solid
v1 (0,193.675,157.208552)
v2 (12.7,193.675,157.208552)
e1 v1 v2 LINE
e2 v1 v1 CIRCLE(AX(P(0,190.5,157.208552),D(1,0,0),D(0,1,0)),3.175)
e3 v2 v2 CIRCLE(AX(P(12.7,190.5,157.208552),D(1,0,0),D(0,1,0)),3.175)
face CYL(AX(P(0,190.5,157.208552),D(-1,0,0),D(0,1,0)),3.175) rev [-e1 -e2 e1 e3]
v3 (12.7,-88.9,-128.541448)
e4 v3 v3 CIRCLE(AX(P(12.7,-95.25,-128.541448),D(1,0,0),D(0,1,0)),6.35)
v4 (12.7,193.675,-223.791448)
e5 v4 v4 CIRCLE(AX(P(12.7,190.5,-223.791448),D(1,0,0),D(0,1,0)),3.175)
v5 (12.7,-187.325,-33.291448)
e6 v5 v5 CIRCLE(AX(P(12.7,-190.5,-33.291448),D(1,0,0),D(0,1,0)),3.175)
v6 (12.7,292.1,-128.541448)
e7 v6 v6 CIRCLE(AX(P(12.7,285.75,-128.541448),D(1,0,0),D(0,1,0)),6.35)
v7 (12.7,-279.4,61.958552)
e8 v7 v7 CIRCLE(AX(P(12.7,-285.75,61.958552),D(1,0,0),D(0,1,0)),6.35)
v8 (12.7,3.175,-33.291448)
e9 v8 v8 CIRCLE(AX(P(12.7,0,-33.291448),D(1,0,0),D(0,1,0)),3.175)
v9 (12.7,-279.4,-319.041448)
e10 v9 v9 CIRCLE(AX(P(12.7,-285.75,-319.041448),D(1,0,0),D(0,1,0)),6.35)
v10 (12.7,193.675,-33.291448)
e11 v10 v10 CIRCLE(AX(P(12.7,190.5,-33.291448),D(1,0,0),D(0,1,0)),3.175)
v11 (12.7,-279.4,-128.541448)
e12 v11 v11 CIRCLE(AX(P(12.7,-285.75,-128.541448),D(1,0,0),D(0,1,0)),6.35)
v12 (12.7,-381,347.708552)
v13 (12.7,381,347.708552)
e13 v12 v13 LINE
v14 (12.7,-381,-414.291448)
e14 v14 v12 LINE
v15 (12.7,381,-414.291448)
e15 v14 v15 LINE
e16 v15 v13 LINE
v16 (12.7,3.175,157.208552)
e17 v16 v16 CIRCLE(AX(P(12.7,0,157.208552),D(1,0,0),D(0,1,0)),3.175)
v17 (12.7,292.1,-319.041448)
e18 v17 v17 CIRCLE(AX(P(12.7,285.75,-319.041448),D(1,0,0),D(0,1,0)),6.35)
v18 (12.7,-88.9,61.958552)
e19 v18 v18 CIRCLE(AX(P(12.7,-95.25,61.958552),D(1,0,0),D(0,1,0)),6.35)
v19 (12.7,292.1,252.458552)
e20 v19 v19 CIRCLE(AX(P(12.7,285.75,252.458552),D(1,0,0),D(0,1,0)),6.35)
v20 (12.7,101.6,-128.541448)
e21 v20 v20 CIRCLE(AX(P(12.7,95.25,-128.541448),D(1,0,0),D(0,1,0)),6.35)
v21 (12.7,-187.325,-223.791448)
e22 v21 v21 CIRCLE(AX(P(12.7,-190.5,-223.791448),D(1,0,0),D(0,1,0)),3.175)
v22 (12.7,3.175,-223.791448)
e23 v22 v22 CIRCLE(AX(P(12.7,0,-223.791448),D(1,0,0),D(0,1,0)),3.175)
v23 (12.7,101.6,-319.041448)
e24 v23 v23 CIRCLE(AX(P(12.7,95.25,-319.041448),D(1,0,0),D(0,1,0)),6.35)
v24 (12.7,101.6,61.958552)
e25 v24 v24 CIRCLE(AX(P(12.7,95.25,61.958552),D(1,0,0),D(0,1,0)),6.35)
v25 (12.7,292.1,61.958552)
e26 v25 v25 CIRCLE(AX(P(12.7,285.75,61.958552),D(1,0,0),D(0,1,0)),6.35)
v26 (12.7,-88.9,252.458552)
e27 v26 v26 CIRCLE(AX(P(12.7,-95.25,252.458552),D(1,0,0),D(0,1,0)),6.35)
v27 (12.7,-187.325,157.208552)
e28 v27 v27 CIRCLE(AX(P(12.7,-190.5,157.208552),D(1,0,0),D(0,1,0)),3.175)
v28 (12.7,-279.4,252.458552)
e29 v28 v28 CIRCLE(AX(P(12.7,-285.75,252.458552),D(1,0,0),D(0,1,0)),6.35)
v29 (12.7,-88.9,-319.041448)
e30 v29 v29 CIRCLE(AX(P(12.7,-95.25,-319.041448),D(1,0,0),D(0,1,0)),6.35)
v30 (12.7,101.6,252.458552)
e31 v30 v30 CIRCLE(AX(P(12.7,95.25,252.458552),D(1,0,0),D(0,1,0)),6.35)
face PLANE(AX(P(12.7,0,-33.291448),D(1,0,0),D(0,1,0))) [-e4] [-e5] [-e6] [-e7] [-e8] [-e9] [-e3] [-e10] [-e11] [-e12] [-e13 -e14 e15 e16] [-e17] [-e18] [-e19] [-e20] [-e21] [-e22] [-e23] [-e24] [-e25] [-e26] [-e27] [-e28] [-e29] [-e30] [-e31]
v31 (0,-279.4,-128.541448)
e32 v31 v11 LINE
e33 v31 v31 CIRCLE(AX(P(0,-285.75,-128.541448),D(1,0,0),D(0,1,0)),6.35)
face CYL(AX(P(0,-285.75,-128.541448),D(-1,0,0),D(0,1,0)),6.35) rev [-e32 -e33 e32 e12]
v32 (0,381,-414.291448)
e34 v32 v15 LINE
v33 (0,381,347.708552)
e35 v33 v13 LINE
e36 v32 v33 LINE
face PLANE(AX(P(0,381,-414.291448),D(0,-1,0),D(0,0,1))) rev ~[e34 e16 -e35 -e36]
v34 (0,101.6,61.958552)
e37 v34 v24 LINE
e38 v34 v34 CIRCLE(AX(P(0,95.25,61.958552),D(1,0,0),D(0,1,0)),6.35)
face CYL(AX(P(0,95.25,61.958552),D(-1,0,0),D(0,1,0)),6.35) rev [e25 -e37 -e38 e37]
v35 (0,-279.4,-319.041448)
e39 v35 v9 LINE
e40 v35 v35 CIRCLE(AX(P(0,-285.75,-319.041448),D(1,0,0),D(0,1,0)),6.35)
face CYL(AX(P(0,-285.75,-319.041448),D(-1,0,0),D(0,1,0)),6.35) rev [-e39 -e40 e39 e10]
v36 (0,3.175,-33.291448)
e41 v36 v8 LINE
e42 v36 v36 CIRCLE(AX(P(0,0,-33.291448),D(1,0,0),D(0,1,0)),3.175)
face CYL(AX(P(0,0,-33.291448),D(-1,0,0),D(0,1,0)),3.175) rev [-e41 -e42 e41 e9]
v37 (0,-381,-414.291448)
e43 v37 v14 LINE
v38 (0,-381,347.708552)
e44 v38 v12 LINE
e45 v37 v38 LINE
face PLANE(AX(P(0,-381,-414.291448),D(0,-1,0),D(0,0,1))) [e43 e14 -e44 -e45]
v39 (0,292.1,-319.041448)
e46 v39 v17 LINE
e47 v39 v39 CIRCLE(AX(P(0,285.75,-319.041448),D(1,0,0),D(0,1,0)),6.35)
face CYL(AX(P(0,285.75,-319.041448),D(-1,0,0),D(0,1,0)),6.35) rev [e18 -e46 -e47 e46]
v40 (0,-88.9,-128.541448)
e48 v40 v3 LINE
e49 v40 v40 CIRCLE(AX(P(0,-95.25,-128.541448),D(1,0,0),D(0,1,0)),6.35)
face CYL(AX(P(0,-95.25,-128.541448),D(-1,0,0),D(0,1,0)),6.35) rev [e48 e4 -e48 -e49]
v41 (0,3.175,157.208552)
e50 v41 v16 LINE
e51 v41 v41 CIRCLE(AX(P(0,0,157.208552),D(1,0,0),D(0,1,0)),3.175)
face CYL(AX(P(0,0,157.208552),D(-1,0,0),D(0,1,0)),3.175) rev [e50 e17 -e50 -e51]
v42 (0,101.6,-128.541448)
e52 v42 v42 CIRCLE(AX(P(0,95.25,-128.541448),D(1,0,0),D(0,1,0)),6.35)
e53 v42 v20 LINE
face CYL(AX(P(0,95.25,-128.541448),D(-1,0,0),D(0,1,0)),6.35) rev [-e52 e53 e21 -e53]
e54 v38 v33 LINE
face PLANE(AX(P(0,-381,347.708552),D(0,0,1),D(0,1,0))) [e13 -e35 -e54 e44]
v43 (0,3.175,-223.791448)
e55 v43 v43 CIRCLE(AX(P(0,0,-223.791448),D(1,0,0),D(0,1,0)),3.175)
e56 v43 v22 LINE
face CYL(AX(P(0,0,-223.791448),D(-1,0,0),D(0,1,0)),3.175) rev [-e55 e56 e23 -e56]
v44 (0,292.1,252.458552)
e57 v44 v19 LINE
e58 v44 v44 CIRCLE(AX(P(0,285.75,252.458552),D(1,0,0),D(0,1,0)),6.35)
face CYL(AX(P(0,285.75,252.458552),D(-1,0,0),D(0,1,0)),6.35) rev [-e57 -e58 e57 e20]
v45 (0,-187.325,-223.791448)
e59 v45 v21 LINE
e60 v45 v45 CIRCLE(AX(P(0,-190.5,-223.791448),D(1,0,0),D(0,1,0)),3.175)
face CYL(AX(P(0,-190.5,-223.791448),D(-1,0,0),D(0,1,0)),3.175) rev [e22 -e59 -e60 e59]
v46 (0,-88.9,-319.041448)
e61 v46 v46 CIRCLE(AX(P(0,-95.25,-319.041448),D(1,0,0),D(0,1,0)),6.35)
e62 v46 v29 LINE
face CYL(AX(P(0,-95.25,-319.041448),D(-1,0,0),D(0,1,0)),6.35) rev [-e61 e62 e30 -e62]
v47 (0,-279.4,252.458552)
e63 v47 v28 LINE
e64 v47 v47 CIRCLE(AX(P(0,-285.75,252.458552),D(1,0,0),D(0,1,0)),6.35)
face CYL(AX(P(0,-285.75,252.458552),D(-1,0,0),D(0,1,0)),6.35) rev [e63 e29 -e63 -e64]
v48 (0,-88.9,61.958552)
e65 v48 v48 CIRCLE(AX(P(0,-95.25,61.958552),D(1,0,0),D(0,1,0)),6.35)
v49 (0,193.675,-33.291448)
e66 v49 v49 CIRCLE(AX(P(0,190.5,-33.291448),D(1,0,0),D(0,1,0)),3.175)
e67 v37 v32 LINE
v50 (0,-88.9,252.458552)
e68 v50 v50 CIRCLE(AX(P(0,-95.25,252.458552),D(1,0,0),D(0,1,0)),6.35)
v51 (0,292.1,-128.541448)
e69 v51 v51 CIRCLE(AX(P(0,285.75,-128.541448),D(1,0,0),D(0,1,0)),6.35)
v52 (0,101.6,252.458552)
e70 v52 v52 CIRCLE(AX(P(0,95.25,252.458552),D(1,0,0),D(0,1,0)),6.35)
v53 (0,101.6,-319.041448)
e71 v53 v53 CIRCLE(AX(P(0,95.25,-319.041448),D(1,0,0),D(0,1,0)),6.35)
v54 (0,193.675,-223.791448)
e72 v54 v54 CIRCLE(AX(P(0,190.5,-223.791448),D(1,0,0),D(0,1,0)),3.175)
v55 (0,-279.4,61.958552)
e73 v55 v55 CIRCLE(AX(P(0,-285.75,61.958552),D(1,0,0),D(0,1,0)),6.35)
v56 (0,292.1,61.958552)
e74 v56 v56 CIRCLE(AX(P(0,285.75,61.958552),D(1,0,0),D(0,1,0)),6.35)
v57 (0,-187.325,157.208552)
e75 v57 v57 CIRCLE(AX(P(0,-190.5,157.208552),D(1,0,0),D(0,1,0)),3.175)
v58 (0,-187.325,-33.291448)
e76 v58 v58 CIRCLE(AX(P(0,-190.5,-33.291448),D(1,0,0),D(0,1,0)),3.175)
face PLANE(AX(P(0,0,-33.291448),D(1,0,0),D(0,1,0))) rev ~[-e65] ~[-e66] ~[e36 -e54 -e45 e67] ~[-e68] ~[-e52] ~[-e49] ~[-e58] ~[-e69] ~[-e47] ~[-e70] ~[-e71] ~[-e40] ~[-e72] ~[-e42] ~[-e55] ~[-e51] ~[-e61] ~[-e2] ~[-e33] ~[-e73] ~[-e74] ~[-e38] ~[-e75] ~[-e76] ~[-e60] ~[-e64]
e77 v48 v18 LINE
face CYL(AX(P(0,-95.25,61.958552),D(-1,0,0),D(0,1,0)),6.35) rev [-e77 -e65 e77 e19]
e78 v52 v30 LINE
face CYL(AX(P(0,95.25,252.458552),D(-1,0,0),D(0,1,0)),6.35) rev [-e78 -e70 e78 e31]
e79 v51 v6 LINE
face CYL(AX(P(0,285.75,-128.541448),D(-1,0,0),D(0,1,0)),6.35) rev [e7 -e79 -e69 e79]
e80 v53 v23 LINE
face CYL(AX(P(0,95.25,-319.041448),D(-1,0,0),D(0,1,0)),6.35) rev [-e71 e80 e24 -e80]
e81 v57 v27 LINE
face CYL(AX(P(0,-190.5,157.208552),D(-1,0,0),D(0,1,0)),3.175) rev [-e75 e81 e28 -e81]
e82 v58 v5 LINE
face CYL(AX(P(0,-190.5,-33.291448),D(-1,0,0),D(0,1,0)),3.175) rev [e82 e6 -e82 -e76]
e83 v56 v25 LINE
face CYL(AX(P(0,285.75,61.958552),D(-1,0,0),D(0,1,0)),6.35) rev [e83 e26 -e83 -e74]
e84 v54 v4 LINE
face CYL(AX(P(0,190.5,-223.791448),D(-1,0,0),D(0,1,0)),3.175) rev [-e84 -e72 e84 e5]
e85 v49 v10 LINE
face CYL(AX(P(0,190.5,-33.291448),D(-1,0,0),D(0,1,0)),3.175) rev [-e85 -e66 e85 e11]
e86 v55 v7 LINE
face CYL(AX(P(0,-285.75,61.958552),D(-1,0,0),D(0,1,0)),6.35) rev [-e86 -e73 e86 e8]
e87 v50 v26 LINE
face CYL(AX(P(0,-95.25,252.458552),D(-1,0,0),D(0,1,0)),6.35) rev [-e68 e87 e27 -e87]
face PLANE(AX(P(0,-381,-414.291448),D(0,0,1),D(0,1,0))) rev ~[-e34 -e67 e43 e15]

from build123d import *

# Parameters (mm, degrees)
F0_W     = 762
F0_H     = 762
F0_R     = 6.35
F0_R_2   = 3.175
F1_DEPTH = 12.7


# Not quite as in the source:
# - the program builds the solid bodies; features that only make, move or delete a surface that nothing else refers to are left out


with BuildPart() as f1:
    # F0 (on Right) → F1 (new body)
    with BuildSketch(Plane.YZ):
        with Locations((0, -33.2914479926)):
            Rectangle(F0_W, F0_H)
        with Locations((-285.75, -319.0414479926)):
            Circle(F0_R, mode=Mode.SUBTRACT)
        with Locations((-95.25, -319.0414479926)):
            Circle(F0_R, mode=Mode.SUBTRACT)
        with Locations((-285.75, -128.5414479926)):
            Circle(F0_R, mode=Mode.SUBTRACT)
        with Locations((-190.5, -223.7914479926)):
            Circle(F0_R_2, mode=Mode.SUBTRACT)
        with Locations((-95.25, -128.5414479926)):
            Circle(F0_R, mode=Mode.SUBTRACT)
        with Locations((95.25, -319.0414479926)):
            Circle(F0_R, mode=Mode.SUBTRACT)
        with Locations((285.75, -319.0414479926)):
            Circle(F0_R, mode=Mode.SUBTRACT)
        with Locations((0, -223.7914479926)):
            Circle(F0_R_2, mode=Mode.SUBTRACT)
        with Locations((95.25, -128.5414479926)):
            Circle(F0_R, mode=Mode.SUBTRACT)
        with Locations((190.5, -223.7914479926)):
            Circle(F0_R_2, mode=Mode.SUBTRACT)
        with Locations((285.75, -128.5414479926)):
            Circle(F0_R, mode=Mode.SUBTRACT)
        with Locations((-285.75, 61.9585520074)):
            Circle(F0_R, mode=Mode.SUBTRACT)
        with Locations((-190.5, -33.2914479926)):
            Circle(F0_R_2, mode=Mode.SUBTRACT)
        with Locations((-95.25, 61.9585520074)):
            Circle(F0_R, mode=Mode.SUBTRACT)
        with Locations((-285.75, 252.4585520074)):
            Circle(F0_R, mode=Mode.SUBTRACT)
        with Locations((-190.5, 157.2085520074)):
            Circle(F0_R_2, mode=Mode.SUBTRACT)
        with Locations((-95.25, 252.4585520074)):
            Circle(F0_R, mode=Mode.SUBTRACT)
        with Locations((0, -33.2914479926)):
            Circle(F0_R_2, mode=Mode.SUBTRACT)
        with Locations((95.25, 61.9585520074)):
            Circle(F0_R, mode=Mode.SUBTRACT)
        with Locations((190.5, -33.2914479926)):
            Circle(F0_R_2, mode=Mode.SUBTRACT)
        with Locations((285.75, 61.9585520074)):
            Circle(F0_R, mode=Mode.SUBTRACT)
        with Locations((0, 157.2085520074)):
            Circle(F0_R_2, mode=Mode.SUBTRACT)
        with Locations((95.25, 252.4585520074)):
            Circle(F0_R, mode=Mode.SUBTRACT)
        with Locations((190.5, 157.2085520074)):
            Circle(F0_R_2, mode=Mode.SUBTRACT)
        with Locations((285.75, 252.4585520074)):
            Circle(F0_R, mode=Mode.SUBTRACT)
    extrude(amount=F1_DEPTH)


solid = f1.part
